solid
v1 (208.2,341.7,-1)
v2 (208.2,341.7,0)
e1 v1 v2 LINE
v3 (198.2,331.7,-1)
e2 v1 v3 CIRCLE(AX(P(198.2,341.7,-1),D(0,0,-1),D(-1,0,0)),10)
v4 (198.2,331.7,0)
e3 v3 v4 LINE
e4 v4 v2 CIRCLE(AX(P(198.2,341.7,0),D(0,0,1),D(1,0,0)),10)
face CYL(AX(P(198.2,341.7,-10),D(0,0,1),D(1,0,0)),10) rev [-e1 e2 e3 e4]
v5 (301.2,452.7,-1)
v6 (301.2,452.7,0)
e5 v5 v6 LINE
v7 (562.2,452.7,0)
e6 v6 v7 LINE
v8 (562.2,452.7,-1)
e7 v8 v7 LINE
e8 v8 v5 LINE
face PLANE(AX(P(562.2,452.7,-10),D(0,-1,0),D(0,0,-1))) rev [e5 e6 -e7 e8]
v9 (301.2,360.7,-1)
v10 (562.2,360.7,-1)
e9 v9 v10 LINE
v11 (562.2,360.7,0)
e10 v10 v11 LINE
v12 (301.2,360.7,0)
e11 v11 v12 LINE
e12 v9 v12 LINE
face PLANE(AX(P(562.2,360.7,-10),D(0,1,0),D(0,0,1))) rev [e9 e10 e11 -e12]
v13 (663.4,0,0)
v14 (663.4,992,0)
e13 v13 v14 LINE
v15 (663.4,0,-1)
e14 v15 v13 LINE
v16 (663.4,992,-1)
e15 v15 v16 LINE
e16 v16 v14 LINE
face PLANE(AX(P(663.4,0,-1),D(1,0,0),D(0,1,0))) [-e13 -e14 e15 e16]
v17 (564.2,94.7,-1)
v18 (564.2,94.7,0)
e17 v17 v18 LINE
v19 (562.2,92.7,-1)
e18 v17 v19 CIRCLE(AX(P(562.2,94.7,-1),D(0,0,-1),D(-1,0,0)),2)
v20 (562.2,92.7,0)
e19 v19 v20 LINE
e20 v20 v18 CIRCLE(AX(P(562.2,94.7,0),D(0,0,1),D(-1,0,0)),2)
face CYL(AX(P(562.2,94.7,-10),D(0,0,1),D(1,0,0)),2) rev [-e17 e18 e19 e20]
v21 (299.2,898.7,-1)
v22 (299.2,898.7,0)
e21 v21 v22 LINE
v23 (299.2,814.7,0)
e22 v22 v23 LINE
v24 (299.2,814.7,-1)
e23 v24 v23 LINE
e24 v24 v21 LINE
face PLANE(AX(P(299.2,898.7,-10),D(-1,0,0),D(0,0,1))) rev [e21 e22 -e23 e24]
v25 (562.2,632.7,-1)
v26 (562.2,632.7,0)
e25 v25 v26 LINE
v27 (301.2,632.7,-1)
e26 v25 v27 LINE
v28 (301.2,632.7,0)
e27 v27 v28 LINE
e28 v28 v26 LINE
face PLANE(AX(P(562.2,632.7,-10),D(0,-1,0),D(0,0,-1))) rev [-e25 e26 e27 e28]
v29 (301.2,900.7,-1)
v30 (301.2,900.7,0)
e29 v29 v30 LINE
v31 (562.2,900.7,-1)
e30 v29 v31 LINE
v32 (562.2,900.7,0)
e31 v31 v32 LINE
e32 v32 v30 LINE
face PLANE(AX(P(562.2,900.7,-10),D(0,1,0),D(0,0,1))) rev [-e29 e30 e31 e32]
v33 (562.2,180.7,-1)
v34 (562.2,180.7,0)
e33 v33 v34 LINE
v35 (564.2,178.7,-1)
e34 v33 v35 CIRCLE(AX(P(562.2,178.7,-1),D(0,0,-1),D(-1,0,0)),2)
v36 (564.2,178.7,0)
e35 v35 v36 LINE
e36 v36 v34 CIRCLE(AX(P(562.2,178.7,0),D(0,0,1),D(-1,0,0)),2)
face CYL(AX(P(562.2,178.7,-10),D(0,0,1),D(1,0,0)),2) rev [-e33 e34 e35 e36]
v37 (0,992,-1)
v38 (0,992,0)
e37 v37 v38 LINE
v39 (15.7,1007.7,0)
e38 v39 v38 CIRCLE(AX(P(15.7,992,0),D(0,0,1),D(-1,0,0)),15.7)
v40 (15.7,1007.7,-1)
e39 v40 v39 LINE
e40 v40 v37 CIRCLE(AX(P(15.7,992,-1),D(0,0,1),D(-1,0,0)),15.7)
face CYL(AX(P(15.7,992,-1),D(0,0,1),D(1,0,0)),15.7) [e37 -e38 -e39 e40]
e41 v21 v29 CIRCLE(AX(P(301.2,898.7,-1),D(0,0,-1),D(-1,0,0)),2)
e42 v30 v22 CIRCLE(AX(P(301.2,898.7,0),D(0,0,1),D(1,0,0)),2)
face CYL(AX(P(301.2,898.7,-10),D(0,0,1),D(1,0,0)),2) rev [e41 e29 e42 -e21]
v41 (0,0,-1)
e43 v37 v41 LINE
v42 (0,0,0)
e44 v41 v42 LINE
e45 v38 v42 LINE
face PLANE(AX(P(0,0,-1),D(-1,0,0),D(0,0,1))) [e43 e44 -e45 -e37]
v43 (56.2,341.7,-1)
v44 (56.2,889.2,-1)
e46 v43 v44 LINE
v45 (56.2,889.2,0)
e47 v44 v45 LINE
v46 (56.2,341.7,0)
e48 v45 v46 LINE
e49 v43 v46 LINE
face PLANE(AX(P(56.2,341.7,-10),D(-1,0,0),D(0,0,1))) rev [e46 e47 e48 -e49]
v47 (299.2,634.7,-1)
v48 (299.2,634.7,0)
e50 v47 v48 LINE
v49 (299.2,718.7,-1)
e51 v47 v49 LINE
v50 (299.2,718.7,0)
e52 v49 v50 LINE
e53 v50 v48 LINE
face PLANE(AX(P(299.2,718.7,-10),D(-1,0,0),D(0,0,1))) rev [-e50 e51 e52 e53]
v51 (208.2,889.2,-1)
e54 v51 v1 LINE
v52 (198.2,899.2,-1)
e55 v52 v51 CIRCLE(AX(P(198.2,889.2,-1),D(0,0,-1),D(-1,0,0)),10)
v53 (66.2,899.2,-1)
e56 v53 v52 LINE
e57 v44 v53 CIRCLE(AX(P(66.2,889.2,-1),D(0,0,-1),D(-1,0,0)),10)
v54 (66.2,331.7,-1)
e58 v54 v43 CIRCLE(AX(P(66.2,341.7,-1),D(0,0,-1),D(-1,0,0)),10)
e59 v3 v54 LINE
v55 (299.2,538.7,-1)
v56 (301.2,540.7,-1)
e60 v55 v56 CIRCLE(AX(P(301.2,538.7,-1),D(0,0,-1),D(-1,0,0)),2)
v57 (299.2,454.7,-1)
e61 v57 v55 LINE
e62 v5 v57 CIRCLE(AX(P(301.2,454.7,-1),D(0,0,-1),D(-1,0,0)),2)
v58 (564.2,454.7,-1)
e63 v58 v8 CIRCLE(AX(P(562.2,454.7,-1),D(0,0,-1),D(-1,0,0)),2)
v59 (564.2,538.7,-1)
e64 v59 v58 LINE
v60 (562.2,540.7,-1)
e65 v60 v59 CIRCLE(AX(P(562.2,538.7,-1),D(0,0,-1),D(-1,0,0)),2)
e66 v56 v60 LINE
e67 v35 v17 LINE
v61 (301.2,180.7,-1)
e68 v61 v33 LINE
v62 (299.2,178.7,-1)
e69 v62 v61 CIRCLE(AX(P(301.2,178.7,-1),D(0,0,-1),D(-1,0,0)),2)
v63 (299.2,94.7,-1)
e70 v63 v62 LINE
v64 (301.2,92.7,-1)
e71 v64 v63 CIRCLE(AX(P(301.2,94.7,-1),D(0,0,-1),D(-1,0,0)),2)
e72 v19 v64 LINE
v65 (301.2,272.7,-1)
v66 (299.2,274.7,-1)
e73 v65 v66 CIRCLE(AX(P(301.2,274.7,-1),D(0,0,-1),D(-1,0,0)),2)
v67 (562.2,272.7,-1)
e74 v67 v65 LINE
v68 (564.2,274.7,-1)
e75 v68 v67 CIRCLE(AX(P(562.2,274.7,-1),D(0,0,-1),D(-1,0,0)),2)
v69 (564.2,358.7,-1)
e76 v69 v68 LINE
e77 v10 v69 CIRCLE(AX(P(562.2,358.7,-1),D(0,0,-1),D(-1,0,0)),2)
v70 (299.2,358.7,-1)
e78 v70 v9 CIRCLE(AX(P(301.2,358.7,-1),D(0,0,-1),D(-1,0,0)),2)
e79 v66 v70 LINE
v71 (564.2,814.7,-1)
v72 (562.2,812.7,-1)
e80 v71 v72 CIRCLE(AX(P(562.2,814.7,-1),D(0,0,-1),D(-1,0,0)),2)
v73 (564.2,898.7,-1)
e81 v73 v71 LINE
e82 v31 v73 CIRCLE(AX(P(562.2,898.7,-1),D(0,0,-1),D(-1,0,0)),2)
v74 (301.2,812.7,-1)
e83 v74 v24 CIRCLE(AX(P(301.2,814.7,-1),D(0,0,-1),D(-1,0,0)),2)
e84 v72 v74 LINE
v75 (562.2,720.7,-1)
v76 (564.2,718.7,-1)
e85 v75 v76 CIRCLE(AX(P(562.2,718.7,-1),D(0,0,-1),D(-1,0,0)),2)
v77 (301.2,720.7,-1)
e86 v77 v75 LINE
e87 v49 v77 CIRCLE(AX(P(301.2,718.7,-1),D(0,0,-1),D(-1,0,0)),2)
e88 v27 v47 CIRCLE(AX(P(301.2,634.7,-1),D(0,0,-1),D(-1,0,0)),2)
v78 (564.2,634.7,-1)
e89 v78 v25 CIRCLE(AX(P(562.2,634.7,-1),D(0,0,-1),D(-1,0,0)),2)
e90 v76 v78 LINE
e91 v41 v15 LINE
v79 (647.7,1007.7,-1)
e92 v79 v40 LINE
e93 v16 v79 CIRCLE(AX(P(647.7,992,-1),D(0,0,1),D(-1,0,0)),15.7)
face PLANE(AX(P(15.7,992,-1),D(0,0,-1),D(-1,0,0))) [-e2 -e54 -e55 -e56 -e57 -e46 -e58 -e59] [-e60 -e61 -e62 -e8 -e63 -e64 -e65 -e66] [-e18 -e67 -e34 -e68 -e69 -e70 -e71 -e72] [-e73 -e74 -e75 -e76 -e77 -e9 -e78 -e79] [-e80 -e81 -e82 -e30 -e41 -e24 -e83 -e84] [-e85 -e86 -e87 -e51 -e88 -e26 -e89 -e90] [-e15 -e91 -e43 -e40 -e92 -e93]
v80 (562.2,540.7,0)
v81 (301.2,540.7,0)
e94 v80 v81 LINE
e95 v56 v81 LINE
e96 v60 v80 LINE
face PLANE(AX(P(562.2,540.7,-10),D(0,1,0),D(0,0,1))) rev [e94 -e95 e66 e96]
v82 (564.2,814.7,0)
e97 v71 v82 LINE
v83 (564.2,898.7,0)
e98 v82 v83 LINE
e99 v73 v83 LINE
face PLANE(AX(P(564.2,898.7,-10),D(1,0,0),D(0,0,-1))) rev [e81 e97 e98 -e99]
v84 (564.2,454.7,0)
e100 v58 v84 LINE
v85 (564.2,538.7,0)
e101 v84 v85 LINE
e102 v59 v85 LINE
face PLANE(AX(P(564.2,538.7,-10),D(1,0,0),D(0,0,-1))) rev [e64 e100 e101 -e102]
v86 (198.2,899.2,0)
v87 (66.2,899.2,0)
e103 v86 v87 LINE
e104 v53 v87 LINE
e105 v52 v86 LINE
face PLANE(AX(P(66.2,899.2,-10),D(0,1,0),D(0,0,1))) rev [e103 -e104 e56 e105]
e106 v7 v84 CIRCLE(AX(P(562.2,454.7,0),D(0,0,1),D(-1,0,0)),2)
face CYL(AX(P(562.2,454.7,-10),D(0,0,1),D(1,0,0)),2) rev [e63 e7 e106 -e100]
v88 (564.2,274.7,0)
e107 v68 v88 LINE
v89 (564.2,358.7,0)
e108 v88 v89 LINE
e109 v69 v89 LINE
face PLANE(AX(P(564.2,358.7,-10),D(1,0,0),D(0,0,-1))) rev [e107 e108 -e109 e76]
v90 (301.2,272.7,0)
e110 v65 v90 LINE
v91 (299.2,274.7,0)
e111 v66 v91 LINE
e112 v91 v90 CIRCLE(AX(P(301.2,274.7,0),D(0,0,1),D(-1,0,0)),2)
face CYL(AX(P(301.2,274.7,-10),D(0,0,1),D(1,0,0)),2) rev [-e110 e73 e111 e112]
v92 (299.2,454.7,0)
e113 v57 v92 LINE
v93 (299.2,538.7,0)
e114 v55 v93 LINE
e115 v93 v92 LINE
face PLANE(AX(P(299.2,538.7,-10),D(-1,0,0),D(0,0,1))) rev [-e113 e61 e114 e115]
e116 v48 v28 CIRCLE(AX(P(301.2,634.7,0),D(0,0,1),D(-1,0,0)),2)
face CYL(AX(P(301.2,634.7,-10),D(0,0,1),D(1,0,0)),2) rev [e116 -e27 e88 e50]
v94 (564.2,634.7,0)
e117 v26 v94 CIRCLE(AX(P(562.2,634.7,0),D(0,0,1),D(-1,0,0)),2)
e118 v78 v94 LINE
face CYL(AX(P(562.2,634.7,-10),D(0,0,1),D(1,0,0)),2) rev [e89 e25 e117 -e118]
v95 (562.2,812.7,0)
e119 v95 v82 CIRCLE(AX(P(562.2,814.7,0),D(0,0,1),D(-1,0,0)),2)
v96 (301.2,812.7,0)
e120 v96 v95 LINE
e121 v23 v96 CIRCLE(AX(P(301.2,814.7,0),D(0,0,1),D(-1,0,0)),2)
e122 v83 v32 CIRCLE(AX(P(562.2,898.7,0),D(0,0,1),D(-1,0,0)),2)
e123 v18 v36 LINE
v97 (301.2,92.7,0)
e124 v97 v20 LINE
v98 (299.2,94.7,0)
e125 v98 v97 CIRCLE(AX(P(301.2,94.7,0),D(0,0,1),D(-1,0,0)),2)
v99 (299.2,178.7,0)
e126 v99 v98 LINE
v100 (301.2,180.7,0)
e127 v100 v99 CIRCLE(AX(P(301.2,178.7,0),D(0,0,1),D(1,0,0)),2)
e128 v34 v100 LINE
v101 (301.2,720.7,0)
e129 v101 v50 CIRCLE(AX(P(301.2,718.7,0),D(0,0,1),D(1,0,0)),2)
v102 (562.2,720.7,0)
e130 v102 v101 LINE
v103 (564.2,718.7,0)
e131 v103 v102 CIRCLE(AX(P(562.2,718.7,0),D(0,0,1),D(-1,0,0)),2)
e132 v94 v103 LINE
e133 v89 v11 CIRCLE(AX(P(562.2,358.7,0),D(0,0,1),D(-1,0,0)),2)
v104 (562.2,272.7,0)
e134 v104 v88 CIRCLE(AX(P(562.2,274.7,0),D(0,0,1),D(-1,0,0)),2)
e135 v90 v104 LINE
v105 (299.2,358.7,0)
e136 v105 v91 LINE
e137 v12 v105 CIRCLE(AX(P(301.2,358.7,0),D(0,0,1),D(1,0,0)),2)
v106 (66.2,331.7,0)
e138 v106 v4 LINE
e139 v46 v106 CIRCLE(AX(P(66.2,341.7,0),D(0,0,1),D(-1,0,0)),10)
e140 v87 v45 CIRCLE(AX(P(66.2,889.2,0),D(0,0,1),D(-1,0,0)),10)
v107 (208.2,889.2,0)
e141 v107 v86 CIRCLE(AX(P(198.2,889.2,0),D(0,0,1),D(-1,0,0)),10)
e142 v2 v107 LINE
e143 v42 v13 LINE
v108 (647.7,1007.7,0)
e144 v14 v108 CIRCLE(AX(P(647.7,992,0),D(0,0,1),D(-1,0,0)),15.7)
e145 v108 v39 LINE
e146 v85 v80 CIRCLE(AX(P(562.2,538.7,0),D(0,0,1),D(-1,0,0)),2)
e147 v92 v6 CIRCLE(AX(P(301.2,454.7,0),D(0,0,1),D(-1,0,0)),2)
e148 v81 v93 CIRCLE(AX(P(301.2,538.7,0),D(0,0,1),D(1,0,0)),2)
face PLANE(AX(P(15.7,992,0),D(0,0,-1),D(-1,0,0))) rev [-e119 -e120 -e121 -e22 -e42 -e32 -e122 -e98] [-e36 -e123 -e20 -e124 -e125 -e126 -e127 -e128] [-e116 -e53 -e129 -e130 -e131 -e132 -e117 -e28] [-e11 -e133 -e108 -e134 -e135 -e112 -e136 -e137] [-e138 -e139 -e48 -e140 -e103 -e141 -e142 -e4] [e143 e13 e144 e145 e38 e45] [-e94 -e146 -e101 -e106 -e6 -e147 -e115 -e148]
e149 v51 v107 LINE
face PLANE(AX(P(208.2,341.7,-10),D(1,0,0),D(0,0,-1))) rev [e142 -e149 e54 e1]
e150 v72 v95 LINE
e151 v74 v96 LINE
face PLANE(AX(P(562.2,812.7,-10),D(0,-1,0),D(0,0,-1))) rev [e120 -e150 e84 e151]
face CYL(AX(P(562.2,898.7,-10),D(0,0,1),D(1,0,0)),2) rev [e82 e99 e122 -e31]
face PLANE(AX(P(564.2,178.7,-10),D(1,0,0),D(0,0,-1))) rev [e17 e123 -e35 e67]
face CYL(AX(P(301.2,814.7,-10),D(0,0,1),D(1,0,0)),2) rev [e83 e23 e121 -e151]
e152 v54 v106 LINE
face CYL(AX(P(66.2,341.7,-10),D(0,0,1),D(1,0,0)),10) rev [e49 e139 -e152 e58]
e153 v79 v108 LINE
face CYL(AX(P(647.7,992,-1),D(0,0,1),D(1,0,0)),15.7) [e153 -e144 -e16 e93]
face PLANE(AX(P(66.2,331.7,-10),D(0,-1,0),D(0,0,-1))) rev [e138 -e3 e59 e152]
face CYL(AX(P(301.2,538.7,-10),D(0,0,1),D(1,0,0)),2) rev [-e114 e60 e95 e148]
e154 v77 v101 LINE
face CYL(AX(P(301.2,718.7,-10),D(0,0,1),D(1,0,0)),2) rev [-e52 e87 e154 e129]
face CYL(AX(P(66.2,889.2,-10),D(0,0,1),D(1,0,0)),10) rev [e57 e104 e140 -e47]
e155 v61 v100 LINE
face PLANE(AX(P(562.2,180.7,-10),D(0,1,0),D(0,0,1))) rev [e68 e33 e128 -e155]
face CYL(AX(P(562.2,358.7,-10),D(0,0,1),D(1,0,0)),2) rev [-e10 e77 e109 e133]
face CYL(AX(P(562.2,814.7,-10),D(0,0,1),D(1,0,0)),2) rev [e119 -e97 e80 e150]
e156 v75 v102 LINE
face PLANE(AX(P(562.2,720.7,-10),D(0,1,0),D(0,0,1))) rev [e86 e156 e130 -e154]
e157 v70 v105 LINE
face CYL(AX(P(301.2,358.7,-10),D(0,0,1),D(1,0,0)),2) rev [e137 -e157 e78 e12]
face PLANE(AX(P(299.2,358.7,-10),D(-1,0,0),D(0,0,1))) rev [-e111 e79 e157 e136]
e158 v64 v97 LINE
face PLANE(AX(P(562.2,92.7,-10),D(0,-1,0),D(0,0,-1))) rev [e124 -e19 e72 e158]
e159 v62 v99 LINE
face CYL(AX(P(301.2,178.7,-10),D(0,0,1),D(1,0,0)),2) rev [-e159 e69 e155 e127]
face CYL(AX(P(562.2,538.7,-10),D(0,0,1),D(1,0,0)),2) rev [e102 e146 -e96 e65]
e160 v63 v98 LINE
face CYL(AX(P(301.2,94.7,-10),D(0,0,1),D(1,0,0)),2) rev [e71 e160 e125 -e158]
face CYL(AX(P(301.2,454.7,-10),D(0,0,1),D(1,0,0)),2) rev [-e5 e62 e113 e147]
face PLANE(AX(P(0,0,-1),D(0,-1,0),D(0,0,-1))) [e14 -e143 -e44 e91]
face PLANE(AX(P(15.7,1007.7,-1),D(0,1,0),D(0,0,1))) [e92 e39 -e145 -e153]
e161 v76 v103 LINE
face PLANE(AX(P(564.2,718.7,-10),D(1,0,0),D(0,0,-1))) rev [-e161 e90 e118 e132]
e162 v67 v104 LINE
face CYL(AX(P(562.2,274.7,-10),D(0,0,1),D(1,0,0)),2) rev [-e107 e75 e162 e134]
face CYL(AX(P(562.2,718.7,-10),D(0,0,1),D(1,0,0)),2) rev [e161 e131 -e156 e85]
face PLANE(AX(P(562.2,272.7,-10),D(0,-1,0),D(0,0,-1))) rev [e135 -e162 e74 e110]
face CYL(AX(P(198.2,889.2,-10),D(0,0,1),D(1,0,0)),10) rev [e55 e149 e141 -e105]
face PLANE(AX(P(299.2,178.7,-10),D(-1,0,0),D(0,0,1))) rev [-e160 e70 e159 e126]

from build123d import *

# Parameters (mm, degrees)
BASE_FLANGE1_DEPTH = 1
CUT_EXTRUDE1_DEPTH = 10
CUT_EXTRUDE2_DEPTH = 10


# Sheet-metal steps are written as plain solids
with BuildPart() as part:
    # Sketch1 → Base-Flange1 (new body)
    with BuildSketch(Plane.XY):
        with BuildLine():
            Line((0, 0), (663.4, 0))
            Line((663.4, 0), (663.4, 992))
            ThreePointArc((663.4, 992), (658.801576465, 1003.101576465), (647.7, 1007.7))
            Line((647.7, 1007.7), (15.7, 1007.7))
            ThreePointArc((15.7, 1007.7), (4.598423535, 1003.101576465), (0, 992))
            Line((0, 992), (0, 0))
        make_face()
    extrude(amount=-BASE_FLANGE1_DEPTH)

    # Sketch9 → Cut-Extrude1 (cut)
    with BuildSketch(Plane.XY):
        with BuildLine():
            Line((562.2, 900.7), (301.2, 900.7))
            ThreePointArc((301.2, 900.7), (299.785786438, 900.114213562), (299.2, 898.7))
            Line((299.2, 898.7), (299.2, 814.7))
            ThreePointArc((299.2, 814.7), (299.785786438, 813.285786438), (301.2, 812.7))
            Line((301.2, 812.7), (562.2, 812.7))
            ThreePointArc((562.2, 812.7), (563.614213562, 813.285786438), (564.2, 814.7))
            Line((564.2, 814.7), (564.2, 898.7))
            ThreePointArc((564.2, 898.7), (563.614213562, 900.114213562), (562.2, 900.7))
        make_face()
        with BuildLine():
            Line((564.2, 718.7), (564.2, 634.7))
            ThreePointArc((564.2, 634.7), (563.614213562, 633.285786438), (562.2, 632.7))
            Line((562.2, 632.7), (301.2, 632.7))
            ThreePointArc((301.2, 632.7), (299.785786438, 633.285786438), (299.2, 634.7))
            Line((299.2, 634.7), (299.2, 718.7))
            ThreePointArc((299.2, 718.7), (299.785786438, 720.114213562), (301.2, 720.7))
            Line((301.2, 720.7), (562.2, 720.7))
            ThreePointArc((562.2, 720.7), (563.614213562, 720.114213562), (564.2, 718.7))
        make_face()
        with BuildLine():
            Line((564.2, 538.7), (564.2, 454.7))
            ThreePointArc((564.2, 454.7), (563.614213562, 453.285786438), (562.2, 452.7))
            Line((562.2, 452.7), (301.2, 452.7))
            ThreePointArc((301.2, 452.7), (299.785786438, 453.285786438), (299.2, 454.7))
            Line((299.2, 454.7), (299.2, 538.7))
            ThreePointArc((299.2, 538.7), (299.785786438, 540.114213562), (301.2, 540.7))
            Line((301.2, 540.7), (562.2, 540.7))
            ThreePointArc((562.2, 540.7), (563.614213562, 540.114213562), (564.2, 538.7))
        make_face()
        with BuildLine():
            Line((564.2, 358.7), (564.2, 274.7))
            ThreePointArc((564.2, 274.7), (563.614213562, 273.285786438), (562.2, 272.7))
            Line((562.2, 272.7), (301.2, 272.7))
            ThreePointArc((301.2, 272.7), (299.785786438, 273.285786438), (299.2, 274.7))
            Line((299.2, 274.7), (299.2, 358.7))
            ThreePointArc((299.2, 358.7), (299.785786438, 360.114213562), (301.2, 360.7))
            Line((301.2, 360.7), (562.2, 360.7))
            ThreePointArc((562.2, 360.7), (563.614213562, 360.114213562), (564.2, 358.7))
        make_face()
        with BuildLine():
            Line((564.2, 178.7), (564.2, 94.7))
            ThreePointArc((564.2, 94.7), (563.614213562, 93.285786438), (562.2, 92.7))
            Line((562.2, 92.7), (301.2, 92.7))
            ThreePointArc((301.2, 92.7), (299.785786438, 93.285786438), (299.2, 94.7))
            Line((299.2, 94.7), (299.2, 178.7))
            ThreePointArc((299.2, 178.7), (299.785786438, 180.114213562), (301.2, 180.7))
            Line((301.2, 180.7), (562.2, 180.7))
            ThreePointArc((562.2, 180.7), (563.614213562, 180.114213562), (564.2, 178.7))
        make_face()
    extrude(amount=-CUT_EXTRUDE1_DEPTH, mode=Mode.SUBTRACT)

    # Sketch10 → Cut-Extrude2 (cut)
    with BuildSketch(Plane.XY):
        with BuildLine():
            Line((66.2, 331.7), (198.2, 331.7))
            ThreePointArc((198.2, 331.7), (205.271067812, 334.628932188), (208.2, 341.7))
            Line((208.2, 341.7), (208.2, 889.2))
            ThreePointArc((208.2, 889.2), (205.271067812, 896.271067812), (198.2, 899.2))
            Line((198.2, 899.2), (66.2, 899.2))
            ThreePointArc((66.2, 899.2), (59.128932188, 896.271067812), (56.2, 889.2))
            Line((56.2, 889.2), (56.2, 341.7))
            ThreePointArc((56.2, 341.7), (59.128932188, 334.628932188), (66.2, 331.7))
        make_face()
    extrude(amount=-CUT_EXTRUDE2_DEPTH, mode=Mode.SUBTRACT)


solid = part.part
